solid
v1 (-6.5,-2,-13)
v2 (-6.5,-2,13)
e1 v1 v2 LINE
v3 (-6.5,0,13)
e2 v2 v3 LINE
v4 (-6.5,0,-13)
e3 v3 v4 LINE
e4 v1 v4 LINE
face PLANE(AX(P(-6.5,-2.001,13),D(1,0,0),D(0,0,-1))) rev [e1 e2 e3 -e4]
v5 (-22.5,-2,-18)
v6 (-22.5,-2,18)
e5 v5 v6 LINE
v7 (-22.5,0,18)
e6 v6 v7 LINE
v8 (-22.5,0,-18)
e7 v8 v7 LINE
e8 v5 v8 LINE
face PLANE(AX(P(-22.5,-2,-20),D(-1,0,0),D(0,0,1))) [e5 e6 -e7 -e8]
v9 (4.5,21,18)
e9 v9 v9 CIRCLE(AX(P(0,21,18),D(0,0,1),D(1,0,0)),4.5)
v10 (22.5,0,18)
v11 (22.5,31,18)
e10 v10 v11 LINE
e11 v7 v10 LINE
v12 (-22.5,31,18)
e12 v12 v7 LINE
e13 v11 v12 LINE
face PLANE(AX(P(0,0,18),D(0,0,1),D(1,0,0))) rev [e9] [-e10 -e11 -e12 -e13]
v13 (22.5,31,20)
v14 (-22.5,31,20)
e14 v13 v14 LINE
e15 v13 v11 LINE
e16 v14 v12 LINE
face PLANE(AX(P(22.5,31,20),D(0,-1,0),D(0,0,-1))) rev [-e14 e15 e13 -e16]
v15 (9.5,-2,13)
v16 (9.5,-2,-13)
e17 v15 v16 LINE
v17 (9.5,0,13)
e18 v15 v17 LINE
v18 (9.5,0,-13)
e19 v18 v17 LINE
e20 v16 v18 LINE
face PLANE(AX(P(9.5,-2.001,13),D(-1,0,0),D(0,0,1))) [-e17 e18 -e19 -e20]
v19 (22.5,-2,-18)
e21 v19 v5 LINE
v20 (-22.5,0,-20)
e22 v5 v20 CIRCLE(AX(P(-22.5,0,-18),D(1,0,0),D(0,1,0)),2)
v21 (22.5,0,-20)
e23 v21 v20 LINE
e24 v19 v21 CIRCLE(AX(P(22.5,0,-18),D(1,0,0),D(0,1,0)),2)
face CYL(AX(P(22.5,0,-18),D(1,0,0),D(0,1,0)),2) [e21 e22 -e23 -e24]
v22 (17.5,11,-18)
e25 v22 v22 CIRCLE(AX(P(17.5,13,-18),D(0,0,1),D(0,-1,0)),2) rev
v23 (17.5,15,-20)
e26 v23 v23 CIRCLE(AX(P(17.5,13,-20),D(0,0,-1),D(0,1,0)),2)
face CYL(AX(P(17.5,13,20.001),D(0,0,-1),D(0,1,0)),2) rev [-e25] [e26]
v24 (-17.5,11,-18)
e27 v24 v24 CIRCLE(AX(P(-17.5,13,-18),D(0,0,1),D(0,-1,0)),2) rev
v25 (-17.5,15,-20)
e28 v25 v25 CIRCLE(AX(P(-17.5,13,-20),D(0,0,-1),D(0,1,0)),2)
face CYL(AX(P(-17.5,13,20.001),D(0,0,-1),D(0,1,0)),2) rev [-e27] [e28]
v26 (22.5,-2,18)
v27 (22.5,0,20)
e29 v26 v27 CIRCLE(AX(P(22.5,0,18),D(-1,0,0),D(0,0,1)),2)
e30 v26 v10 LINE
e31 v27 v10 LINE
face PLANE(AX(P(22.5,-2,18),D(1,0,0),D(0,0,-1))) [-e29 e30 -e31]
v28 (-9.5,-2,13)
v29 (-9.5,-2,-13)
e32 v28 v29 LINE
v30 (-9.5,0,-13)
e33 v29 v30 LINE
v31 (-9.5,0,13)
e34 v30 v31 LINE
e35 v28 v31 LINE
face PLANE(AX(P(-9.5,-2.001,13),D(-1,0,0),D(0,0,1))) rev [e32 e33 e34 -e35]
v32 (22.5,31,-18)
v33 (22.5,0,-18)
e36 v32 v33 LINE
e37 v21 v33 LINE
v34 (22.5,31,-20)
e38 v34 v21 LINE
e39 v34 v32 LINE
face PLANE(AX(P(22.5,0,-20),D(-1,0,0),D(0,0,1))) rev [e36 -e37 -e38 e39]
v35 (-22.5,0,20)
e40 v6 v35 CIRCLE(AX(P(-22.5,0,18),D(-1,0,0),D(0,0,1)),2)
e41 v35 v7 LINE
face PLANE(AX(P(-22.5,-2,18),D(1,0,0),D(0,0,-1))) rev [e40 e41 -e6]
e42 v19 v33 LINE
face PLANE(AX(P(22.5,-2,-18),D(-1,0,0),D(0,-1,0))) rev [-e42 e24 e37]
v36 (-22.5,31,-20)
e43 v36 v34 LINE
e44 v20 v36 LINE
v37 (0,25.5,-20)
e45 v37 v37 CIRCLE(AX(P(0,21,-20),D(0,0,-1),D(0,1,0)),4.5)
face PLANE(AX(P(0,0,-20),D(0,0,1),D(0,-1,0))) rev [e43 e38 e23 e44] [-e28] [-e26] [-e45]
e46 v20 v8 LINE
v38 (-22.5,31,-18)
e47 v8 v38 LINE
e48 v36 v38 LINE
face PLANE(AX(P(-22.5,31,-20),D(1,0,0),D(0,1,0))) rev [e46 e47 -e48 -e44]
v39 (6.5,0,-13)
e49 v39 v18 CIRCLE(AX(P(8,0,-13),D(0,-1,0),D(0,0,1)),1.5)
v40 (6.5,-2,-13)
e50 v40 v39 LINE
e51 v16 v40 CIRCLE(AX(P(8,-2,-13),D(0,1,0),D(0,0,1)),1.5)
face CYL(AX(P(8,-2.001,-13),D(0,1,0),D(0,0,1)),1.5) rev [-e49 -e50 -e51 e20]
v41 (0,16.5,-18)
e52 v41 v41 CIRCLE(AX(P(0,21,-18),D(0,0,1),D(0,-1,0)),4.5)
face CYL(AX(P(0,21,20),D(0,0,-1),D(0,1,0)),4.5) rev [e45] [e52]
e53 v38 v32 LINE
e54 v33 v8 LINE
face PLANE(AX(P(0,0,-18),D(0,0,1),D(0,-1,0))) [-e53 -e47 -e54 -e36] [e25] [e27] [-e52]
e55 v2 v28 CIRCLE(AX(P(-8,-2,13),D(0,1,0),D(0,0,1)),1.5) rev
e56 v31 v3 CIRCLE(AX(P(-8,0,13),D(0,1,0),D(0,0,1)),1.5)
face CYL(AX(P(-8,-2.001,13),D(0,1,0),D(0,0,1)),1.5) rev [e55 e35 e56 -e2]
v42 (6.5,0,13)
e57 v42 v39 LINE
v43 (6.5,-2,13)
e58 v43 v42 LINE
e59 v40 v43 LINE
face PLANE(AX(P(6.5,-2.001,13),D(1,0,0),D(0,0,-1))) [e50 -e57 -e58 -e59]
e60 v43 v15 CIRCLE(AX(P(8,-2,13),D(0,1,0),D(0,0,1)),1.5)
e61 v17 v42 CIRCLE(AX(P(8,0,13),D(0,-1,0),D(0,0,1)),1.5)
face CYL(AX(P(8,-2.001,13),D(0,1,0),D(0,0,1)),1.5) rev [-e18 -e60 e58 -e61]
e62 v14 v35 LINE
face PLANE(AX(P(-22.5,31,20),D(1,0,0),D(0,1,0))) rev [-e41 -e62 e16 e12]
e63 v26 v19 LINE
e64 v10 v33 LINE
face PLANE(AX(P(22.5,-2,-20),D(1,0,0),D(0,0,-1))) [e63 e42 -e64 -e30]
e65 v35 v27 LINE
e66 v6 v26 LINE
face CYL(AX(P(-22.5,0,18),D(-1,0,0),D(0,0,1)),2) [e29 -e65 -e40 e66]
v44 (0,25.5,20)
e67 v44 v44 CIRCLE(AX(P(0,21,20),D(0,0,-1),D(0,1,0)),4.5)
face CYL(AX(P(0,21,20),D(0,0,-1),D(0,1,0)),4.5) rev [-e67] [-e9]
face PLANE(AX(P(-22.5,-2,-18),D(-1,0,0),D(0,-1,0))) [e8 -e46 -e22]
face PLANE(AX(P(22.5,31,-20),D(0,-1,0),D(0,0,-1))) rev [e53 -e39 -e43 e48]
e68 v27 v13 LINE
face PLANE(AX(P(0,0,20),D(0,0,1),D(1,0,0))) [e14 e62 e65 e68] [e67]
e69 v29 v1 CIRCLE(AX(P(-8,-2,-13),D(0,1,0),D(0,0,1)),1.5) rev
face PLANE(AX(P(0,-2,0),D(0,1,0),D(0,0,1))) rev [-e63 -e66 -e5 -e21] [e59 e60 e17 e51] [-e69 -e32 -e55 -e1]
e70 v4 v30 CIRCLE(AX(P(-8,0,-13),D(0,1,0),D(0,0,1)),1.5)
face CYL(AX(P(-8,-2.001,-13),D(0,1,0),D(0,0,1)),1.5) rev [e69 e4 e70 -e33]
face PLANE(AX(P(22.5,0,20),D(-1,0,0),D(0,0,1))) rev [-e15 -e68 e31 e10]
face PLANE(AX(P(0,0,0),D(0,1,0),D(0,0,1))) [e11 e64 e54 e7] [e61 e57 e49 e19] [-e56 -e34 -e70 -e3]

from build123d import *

# Parameters (mm, degrees)
SZKIC1_W                       = 45
SZKIC1_H                       = 40
ODGI_CIE_BAZOWE1_DEPTH         = 2
ODGI_CIE_START                 = -22.5
ODGI_CIE_KRAW_DZI1_DEPTH       = 45
ODGI_CIE_KRAW_DZI1_2_OUTLINE_W = 31
ODGI_CIE_KRAW_DZI1_2_OUTLINE_H = 2
ODGI_CIE_KRAW_DZI1_2_DEPTH     = 45
WYTNIJ_WYCI_GNI_CIE1_REACH     = 45.212
SZKIC13_R                      = 4.5
WYTNIJ_WYCI_GNI_CIE2_DEPTH     = 56.38275905
WYTNIJ_WYCI_GNI_CIE3_REACH     = 57.383
SZKIC14_R                      = 2


# Read off the part's stored shape, not the designer's step: Odgięcie krawędzi1
# Sheet-metal steps are written as plain solids
with BuildPart() as part:
    # Szkic1 → Odgięcie bazowe1 (new body)
    with BuildSketch(Plane(origin=(0, 0, 0), x_dir=(1, 0, 0), z_dir=(0, 1, 0))):
        Rectangle(SZKIC1_W, SZKIC1_H)
    extrude(amount=-ODGI_CIE_BAZOWE1_DEPTH)

    # Odgięcie krawędzi1 outline → Odgięcie krawędzi1 (cut)
    with BuildSketch(Plane.YZ.offset(ODGI_CIE_START)):
        with BuildLine():
            ThreePointArc((0, -20), (-1.414213562, -19.414213562), (-2, -18))
            Line((-2, -18), (-2, -20))
            Line((-2, -20), (0, -20))
        make_face()
        with BuildLine():
            Line((-2, 20), (-2, 18))
            ThreePointArc((-2, 18), (-1.414213562, 19.414213562), (0, 20))
            Line((0, 20), (-2, 20))
        make_face()
    extrude(amount=ODGI_CIE_KRAW_DZI1_DEPTH, mode=Mode.SUBTRACT)

    # Odgi_cie kraw_dzi1 2 outline → Odgi_cie kraw_dzi1 2 (add)
    with BuildSketch(Plane.YZ.offset(ODGI_CIE_START)):
        with Locations((15.5, -19)):
            Rectangle(ODGI_CIE_KRAW_DZI1_2_OUTLINE_W, ODGI_CIE_KRAW_DZI1_2_OUTLINE_H)
        with Locations((15.5, 19)):
            Rectangle(ODGI_CIE_KRAW_DZI1_2_OUTLINE_W, ODGI_CIE_KRAW_DZI1_2_OUTLINE_H)
    extrude(amount=ODGI_CIE_KRAW_DZI1_2_DEPTH)

    # Szkic12 → Wytnij-wyciągnięcie1 (cut, up to next)
    with BuildSketch(Plane(origin=(0, 0, 0), x_dir=(1, 0, 0), z_dir=(0, 1, 0)), mode=Mode.PRIVATE) as wytnij_wyci_gni_cie1_sk1:
        with BuildLine():
            Line((-9.5, -13), (-9.5, 13))
            ThreePointArc((-9.5, 13), (-8, 14.5), (-6.5, 13))
            Line((-6.5, 13), (-6.5, -13))
            ThreePointArc((-6.5, -13), (-8, -14.5), (-9.5, -13))
        make_face()
    wytnij_wyci_gni_cie1_tool1 = extrude(wytnij_wyci_gni_cie1_sk1.sketch, amount=-WYTNIJ_WYCI_GNI_CIE1_REACH, mode=Mode.PRIVATE) & part.part
    wytnij_wyci_gni_cie1 = wytnij_wyci_gni_cie1_tool1.solids().sort_by_distance((-8, 0, 0))[0]
    add(wytnij_wyci_gni_cie1, mode=Mode.SUBTRACT)

    # Lustro1: Wytnij-wyciągnięcie1 across plane
    add(wytnij_wyci_gni_cie1.mirror(Plane(origin=(0, 0, 0), x_dir=(0, 0, 1), z_dir=(1, 0, 0))), mode=Mode.SUBTRACT)

    # Szkic13 → Wytnij-wyciągnięcie2 (cut, through all)
    with BuildSketch(Plane(origin=(0, 0, -20), x_dir=(-1, 0, 0), z_dir=(0, 0, -1))):
        with Locations(Location((0, 21, 0), (0, 0, 90))):
            Circle(SZKIC13_R)
    extrude(amount=-WYTNIJ_WYCI_GNI_CIE2_DEPTH, mode=Mode.SUBTRACT)

    # Szkic14 → Wytnij-wyciągnięcie3 (cut, up to next)
    with BuildSketch(Plane(origin=(0, 0, -20), x_dir=(-1, 0, 0), z_dir=(0, 0, -1)), mode=Mode.PRIVATE) as wytnij_wyci_gni_cie3_sk1:
        with Locations(Location((-17.5, 13, 0), (0, 0, 90))):
            Circle(SZKIC14_R)
    wytnij_wyci_gni_cie3_tool1 = extrude(wytnij_wyci_gni_cie3_sk1.sketch, amount=-WYTNIJ_WYCI_GNI_CIE3_REACH, mode=Mode.PRIVATE) & part.part
    # Szkic14 → Wytnij-wyciągnięcie3 (cut, up to next)
    with BuildSketch(Plane(origin=(0, 0, -20), x_dir=(-1, 0, 0), z_dir=(0, 0, -1)), mode=Mode.PRIVATE) as wytnij_wyci_gni_cie3_sk2:
        with Locations(Location((17.5, 13, 0), (0, 0, 90))):
            Circle(SZKIC14_R)
    wytnij_wyci_gni_cie3_tool2 = extrude(wytnij_wyci_gni_cie3_sk2.sketch, amount=-WYTNIJ_WYCI_GNI_CIE3_REACH, mode=Mode.PRIVATE) & part.part
    add(wytnij_wyci_gni_cie3_tool1.solids().sort_by_distance((17.5, 13, -20))[0], mode=Mode.SUBTRACT)
    add(wytnij_wyci_gni_cie3_tool2.solids().sort_by_distance((-17.5, 13, -20))[0], mode=Mode.SUBTRACT)


solid = part.part
